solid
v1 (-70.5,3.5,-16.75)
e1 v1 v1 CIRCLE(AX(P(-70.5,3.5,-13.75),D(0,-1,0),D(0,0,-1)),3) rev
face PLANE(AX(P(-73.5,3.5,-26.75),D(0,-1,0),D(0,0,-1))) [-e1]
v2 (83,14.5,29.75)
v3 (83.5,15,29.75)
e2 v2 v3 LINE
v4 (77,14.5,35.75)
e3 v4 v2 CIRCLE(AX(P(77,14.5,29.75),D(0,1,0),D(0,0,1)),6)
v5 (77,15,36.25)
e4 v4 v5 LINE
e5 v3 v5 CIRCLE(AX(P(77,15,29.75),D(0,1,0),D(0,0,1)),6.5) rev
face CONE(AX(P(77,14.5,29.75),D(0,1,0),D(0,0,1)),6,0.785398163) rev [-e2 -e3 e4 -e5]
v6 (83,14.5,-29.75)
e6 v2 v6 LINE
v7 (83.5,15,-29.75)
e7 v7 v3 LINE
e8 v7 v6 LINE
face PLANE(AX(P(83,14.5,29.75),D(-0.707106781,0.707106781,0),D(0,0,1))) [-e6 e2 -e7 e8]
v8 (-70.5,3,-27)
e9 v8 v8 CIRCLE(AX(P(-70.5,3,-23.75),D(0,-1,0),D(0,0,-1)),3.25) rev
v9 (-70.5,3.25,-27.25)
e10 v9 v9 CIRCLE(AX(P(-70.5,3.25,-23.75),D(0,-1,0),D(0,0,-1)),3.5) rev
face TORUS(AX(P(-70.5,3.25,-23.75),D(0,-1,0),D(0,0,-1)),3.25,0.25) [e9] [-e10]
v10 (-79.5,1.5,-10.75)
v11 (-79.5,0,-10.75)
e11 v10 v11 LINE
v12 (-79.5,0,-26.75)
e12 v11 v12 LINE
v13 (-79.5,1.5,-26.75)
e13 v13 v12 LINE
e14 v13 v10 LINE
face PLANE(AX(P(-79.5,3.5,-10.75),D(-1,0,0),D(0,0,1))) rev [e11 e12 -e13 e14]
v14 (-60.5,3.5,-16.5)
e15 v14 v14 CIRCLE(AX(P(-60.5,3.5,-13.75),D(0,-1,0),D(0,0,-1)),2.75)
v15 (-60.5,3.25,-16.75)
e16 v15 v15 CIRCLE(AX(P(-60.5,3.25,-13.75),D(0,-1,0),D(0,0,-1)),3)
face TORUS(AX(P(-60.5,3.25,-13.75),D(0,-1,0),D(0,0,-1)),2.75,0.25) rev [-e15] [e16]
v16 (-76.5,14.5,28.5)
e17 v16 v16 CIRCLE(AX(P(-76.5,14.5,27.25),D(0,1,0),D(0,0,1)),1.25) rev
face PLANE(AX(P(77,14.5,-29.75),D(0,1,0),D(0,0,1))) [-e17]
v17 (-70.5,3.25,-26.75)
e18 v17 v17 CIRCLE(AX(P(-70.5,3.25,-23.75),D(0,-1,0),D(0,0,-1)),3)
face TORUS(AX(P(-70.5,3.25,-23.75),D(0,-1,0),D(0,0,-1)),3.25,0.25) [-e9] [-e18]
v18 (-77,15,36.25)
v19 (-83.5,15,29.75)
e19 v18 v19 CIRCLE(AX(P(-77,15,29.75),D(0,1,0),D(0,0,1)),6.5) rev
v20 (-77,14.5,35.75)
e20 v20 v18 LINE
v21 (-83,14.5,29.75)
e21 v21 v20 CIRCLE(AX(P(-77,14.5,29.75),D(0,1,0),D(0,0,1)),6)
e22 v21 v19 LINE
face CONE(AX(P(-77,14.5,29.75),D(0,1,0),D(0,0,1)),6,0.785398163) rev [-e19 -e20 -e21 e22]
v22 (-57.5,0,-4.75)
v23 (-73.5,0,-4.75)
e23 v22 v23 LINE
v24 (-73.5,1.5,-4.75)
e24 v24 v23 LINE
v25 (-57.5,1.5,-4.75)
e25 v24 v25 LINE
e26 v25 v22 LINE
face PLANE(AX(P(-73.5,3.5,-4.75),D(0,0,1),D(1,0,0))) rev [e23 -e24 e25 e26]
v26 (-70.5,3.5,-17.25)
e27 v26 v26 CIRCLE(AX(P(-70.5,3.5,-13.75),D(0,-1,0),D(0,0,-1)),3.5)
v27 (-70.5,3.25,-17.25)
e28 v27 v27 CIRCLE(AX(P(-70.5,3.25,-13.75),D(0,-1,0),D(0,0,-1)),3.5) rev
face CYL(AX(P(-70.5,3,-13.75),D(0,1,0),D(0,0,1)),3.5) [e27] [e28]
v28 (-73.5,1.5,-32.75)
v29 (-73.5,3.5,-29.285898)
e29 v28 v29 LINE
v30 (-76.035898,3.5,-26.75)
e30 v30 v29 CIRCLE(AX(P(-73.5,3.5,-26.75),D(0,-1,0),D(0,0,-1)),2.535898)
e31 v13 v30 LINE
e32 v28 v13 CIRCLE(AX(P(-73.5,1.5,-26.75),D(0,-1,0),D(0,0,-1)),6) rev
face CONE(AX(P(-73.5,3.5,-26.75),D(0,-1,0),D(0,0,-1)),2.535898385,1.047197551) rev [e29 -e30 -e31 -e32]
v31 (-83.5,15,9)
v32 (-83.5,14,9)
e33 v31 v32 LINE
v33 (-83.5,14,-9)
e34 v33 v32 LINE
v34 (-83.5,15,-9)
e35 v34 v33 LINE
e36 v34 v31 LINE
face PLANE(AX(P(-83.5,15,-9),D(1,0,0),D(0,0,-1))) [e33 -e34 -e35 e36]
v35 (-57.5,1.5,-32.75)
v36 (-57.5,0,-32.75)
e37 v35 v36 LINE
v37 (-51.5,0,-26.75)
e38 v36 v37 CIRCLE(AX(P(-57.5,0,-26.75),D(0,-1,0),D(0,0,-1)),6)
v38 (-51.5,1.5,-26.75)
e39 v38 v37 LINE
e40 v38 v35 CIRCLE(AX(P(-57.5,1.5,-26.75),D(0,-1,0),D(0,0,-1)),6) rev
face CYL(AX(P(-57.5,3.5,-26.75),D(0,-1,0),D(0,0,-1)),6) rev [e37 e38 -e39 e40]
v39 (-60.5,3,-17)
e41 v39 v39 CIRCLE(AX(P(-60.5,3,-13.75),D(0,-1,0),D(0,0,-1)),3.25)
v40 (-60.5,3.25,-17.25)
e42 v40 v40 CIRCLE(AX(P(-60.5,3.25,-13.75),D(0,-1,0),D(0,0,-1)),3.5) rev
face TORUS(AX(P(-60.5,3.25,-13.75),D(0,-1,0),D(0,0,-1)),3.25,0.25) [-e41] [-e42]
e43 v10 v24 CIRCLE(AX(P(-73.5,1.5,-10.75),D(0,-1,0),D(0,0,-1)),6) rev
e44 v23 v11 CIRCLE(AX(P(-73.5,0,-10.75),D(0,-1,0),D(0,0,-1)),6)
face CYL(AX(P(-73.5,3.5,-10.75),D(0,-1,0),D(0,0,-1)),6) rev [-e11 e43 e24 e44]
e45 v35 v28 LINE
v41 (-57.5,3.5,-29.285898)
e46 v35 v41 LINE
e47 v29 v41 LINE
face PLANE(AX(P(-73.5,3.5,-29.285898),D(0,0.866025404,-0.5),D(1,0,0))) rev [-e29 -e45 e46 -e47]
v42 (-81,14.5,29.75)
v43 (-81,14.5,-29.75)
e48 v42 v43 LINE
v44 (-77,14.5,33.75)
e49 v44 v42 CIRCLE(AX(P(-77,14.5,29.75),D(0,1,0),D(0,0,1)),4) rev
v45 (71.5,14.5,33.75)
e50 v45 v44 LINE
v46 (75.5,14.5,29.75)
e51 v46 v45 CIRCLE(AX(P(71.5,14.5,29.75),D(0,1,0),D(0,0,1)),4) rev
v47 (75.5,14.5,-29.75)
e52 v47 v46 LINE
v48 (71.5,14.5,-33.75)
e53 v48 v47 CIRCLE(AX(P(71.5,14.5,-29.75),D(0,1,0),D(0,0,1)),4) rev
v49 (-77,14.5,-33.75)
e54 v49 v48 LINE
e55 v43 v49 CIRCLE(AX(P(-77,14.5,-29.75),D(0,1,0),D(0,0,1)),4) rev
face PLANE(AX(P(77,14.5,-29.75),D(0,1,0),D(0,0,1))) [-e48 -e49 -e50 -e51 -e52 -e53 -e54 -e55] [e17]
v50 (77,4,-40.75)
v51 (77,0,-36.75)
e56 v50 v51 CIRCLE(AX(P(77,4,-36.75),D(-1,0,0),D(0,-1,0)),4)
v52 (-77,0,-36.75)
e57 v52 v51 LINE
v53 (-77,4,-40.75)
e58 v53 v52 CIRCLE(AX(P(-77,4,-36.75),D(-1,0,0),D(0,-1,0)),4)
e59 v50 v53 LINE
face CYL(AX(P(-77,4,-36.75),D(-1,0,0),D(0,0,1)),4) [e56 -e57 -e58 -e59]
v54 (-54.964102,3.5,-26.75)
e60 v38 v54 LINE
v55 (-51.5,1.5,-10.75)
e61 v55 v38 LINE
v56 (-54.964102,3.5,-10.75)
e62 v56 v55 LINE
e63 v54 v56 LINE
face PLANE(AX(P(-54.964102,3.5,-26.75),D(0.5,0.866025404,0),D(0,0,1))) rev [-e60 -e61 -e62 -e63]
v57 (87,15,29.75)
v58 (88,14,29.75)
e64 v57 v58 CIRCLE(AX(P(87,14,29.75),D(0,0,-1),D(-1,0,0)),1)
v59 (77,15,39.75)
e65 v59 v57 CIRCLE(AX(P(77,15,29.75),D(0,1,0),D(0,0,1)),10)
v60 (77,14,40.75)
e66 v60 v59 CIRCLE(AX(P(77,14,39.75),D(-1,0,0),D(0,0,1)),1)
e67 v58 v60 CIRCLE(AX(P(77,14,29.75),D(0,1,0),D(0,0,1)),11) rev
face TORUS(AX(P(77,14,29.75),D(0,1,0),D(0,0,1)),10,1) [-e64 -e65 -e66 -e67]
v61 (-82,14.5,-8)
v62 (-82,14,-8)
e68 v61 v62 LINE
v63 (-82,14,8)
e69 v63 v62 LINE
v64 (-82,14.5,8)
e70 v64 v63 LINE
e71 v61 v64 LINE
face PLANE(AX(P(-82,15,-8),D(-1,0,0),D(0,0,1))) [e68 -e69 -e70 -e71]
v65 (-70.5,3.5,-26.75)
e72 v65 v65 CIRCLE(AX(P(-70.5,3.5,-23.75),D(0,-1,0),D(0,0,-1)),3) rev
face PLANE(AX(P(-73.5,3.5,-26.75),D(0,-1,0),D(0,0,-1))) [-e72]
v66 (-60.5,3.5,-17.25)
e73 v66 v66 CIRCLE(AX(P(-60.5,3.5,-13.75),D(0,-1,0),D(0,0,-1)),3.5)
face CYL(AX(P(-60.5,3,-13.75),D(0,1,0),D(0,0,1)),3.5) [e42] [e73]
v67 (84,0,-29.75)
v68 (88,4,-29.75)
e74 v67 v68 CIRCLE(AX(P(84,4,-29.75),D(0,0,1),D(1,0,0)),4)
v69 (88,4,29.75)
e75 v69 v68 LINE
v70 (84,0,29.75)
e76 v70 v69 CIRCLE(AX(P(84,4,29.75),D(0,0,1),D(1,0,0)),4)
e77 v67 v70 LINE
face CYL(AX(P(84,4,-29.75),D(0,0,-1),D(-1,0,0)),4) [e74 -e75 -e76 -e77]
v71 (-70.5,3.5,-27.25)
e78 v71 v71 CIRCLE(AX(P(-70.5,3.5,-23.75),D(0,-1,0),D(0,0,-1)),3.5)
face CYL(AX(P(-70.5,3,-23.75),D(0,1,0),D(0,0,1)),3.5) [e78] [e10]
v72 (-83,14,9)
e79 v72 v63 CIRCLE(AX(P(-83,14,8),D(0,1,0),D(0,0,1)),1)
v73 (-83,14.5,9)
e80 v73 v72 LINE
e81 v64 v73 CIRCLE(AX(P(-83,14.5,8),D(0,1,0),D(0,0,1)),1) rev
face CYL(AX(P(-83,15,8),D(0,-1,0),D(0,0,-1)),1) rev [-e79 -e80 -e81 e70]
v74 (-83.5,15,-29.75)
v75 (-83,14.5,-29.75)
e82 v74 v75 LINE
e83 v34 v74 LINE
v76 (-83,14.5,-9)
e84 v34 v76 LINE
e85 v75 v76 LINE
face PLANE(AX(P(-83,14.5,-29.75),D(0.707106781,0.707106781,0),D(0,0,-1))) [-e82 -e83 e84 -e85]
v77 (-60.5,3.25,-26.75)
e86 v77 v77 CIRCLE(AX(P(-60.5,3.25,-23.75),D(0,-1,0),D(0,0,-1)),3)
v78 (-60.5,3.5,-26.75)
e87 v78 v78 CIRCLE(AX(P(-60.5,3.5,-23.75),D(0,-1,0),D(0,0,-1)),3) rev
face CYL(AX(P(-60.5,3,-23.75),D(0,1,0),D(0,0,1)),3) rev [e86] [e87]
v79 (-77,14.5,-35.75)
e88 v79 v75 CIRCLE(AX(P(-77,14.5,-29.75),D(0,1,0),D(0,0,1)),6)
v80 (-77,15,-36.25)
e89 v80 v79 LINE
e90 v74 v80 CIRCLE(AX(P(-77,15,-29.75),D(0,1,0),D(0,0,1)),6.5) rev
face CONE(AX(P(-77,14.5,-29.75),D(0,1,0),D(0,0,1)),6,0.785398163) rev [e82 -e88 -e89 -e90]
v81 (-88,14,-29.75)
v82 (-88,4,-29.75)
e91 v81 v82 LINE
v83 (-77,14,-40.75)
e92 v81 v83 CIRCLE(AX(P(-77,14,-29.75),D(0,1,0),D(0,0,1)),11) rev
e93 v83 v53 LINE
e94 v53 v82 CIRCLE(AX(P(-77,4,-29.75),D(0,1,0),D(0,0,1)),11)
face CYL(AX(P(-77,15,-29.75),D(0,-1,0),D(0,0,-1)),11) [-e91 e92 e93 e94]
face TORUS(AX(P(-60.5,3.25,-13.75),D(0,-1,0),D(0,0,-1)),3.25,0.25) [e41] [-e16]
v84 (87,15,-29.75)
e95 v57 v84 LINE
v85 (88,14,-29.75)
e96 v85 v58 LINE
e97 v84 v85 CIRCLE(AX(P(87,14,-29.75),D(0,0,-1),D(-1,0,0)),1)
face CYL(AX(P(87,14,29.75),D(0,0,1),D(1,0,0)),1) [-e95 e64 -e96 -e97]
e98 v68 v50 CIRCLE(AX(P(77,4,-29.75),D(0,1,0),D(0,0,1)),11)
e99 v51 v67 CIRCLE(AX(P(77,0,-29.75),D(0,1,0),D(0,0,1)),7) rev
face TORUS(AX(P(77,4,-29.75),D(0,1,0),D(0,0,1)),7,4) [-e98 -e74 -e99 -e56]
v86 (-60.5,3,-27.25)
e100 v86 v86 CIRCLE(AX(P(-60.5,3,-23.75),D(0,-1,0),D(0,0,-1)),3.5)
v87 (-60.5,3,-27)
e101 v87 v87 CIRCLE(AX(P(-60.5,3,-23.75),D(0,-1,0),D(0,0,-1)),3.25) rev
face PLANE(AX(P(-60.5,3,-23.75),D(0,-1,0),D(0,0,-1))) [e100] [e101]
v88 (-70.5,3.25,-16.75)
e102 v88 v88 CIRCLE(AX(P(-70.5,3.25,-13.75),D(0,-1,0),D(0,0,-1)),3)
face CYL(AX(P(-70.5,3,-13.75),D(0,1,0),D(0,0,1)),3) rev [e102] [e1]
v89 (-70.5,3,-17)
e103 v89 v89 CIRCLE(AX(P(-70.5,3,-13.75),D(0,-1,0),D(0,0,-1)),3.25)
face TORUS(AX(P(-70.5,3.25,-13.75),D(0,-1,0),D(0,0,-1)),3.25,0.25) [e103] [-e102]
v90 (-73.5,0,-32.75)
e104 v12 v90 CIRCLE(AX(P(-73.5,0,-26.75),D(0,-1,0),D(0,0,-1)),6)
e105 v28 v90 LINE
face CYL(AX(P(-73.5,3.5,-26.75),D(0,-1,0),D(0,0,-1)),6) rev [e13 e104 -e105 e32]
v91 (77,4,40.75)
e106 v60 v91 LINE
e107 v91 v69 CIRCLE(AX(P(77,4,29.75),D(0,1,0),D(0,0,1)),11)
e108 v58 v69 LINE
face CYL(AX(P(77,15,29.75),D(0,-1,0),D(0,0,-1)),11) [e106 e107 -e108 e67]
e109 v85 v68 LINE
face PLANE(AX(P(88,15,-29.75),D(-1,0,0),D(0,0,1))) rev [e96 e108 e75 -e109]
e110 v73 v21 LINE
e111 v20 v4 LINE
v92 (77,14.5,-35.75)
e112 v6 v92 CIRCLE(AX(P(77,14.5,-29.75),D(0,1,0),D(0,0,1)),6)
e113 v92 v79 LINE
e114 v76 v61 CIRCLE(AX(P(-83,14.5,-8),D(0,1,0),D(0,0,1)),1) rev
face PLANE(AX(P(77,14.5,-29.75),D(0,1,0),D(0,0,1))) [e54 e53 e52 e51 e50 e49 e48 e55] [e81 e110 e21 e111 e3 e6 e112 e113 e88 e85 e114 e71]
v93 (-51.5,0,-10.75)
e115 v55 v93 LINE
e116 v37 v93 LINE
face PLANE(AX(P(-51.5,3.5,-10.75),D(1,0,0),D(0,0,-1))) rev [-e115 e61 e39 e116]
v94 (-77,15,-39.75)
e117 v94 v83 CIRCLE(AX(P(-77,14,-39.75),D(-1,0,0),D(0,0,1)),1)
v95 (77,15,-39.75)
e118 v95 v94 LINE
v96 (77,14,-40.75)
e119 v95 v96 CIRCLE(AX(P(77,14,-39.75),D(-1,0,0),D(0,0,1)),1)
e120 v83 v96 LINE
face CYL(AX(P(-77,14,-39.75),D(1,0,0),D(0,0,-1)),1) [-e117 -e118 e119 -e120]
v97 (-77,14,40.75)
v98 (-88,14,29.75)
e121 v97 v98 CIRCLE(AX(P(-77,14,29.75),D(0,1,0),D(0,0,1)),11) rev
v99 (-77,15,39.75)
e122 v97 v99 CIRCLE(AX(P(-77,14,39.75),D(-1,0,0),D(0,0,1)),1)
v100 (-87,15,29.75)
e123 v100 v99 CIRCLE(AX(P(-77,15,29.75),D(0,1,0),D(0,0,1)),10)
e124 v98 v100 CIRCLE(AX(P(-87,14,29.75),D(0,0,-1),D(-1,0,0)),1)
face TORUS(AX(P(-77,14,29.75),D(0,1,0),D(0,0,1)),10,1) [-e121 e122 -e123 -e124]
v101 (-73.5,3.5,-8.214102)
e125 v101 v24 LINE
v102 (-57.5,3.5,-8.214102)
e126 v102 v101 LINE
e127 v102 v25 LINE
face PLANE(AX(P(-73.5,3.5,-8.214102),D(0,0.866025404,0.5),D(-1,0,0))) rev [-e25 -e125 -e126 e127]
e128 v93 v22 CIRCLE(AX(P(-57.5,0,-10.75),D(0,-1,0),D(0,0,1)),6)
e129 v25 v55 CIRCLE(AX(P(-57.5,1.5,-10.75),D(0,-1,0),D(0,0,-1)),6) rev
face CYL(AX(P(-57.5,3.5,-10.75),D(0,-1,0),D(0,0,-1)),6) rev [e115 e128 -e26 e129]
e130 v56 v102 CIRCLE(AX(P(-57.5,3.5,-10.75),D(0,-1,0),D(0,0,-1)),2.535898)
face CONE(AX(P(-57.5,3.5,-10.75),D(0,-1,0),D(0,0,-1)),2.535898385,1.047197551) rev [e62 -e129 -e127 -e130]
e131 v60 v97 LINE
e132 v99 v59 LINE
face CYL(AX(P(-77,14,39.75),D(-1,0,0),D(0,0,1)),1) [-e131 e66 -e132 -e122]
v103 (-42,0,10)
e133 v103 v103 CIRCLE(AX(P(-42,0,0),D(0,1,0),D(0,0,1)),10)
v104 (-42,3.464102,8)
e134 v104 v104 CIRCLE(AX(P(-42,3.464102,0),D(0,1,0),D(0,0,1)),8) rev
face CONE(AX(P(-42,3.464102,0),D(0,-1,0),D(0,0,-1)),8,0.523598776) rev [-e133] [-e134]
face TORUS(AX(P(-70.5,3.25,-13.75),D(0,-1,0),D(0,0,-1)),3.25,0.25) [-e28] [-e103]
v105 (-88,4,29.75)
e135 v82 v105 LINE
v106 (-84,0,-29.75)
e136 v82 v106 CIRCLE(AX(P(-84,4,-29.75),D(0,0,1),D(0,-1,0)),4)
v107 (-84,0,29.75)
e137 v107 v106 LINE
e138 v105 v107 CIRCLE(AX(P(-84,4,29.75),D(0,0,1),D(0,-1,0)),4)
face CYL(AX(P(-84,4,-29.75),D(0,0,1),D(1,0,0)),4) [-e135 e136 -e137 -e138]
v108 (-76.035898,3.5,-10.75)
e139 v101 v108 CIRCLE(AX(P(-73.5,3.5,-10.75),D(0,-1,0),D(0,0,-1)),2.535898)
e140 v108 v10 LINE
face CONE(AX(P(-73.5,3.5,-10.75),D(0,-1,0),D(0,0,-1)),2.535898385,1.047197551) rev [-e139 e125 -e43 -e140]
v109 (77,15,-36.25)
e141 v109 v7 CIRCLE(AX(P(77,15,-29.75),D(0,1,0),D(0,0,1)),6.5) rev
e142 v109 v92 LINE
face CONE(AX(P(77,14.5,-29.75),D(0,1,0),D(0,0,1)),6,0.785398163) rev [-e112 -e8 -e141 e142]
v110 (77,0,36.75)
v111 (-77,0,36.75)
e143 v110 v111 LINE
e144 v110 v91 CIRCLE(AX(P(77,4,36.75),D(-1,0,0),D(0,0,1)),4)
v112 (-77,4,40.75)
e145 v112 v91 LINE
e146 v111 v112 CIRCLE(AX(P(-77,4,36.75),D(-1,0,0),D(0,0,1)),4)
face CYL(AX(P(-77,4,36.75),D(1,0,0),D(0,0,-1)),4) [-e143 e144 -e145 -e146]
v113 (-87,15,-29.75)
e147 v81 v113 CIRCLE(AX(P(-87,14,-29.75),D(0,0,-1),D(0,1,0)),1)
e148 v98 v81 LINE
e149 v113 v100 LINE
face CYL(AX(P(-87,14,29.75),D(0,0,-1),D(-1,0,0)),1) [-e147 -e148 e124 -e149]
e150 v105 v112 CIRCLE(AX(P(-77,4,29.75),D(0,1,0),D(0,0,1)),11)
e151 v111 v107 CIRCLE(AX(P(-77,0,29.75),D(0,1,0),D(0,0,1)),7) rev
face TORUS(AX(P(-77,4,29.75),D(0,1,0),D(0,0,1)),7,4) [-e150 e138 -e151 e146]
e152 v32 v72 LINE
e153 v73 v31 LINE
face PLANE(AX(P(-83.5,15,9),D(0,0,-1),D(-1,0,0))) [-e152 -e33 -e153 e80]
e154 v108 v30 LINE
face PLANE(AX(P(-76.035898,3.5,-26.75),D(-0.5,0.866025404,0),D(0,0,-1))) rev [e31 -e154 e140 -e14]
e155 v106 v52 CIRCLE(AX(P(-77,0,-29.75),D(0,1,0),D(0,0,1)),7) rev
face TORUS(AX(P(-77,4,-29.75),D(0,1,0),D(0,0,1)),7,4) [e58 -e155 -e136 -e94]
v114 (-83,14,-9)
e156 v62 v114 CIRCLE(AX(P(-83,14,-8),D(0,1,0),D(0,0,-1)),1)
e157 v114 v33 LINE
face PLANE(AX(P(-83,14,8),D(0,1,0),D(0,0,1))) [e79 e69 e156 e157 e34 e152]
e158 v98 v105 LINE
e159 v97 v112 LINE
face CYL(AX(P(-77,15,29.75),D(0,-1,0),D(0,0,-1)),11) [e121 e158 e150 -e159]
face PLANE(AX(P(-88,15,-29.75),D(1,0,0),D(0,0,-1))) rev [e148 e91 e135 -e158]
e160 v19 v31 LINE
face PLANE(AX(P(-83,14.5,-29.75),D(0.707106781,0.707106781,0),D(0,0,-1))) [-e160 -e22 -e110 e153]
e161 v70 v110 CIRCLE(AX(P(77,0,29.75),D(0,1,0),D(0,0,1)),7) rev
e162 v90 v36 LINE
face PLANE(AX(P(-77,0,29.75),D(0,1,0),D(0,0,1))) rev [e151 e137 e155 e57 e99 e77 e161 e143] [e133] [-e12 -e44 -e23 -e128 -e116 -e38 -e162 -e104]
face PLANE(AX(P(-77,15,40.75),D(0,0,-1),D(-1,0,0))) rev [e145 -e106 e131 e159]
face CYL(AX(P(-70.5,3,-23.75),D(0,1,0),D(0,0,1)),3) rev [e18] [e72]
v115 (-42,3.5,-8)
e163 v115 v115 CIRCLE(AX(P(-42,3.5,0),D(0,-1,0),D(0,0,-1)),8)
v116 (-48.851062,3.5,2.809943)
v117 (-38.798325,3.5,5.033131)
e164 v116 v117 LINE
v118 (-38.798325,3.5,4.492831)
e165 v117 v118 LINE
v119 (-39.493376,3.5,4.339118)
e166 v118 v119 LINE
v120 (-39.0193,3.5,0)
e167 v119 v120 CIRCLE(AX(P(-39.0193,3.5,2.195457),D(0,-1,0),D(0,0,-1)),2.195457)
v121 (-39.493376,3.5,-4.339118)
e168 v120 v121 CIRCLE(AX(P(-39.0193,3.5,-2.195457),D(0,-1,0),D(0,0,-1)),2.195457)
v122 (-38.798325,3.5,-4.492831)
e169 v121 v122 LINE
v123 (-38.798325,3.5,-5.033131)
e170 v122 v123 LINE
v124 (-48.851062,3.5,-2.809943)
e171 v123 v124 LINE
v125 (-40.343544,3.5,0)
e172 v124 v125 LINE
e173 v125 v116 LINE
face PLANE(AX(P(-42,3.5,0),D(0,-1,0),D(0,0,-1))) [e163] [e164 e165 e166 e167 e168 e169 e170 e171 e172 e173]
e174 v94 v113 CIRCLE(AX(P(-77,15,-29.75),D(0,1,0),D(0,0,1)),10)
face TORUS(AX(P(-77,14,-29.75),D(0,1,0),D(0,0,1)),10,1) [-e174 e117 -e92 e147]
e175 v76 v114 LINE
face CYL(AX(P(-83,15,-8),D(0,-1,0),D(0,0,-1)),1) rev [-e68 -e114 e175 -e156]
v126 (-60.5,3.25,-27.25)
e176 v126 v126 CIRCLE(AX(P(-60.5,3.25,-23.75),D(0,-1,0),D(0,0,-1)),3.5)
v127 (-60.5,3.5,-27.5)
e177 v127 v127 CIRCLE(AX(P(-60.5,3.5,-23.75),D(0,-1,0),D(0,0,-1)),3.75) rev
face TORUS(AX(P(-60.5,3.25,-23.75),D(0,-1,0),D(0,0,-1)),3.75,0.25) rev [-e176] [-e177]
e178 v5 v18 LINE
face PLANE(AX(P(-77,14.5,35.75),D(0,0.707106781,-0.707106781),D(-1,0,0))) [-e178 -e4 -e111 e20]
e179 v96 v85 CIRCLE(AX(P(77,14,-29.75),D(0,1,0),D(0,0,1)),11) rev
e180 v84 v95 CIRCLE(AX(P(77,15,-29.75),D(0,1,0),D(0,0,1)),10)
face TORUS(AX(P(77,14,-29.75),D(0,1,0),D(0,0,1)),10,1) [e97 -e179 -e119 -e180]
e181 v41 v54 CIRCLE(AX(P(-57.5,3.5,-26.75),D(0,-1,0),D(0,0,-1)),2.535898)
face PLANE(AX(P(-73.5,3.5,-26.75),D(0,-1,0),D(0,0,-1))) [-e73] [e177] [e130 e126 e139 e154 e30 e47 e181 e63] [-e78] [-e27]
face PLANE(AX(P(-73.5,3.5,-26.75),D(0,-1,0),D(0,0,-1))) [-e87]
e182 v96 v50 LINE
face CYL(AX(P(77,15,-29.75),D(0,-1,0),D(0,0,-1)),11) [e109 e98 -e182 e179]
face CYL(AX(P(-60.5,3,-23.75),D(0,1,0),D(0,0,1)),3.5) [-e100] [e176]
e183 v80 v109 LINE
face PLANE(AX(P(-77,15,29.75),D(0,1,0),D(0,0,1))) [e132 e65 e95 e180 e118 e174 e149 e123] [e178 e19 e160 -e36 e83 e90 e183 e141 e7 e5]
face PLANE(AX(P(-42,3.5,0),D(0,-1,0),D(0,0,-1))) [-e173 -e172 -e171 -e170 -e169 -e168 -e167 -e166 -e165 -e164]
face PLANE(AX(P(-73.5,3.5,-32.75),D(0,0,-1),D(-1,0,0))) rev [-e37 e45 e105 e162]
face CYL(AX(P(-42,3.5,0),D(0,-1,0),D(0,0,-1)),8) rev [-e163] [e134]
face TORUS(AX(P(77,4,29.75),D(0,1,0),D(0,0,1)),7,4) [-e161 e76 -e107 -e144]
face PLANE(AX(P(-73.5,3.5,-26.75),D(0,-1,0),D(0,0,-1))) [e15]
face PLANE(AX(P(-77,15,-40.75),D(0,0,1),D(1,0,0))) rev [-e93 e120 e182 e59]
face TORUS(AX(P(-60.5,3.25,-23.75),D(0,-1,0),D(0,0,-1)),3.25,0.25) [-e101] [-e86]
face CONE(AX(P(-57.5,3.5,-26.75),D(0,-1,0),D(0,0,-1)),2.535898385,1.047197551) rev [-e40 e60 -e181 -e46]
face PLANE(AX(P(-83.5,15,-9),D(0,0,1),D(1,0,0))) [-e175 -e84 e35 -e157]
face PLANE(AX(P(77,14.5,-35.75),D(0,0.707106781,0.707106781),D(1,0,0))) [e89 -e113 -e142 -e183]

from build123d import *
from OCP.BRepFilletAPI import BRepFilletAPI_MakeChamfer

# Parameters (mm, degrees)
SALIENTE_EXTRUIR2_DEPTH    = 15
REDONDEO1_R                = 1
REDONDEO2_R                = 4
CORTAR_EXTRUIR1_DEPTH      = 0.5
CHAFL_N1_SIZE              = 0.5
CORTAR_EXTRUIR2_DEPTH      = 99.055150429
CORTAR_EXTRUIR2_DEPTH_BACK = 0.5
CROQUIS6_R                 = 8
CORTAR_EXTRUIR3_DEPTH      = 3.5
CHAFL_N2_SIZE              = 2
CHAFL_N2_SIZE2             = 3.464101615
CROQUIS7_R                 = 3.5
CROQUIS7_R_2               = 3
SALIENTE_EXTRUIR3_DEPTH    = 0.5
REDONDEO5_R                = 0.25


with BuildPart() as part:
    # Croquis1 → Saliente-Extruir2 (new body)
    with BuildSketch(Plane(origin=(0, 0, 0), x_dir=(1, 0, 0), z_dir=(0, 1, 0))):
        with BuildLine():
            Line((-77, 40.75), (77, 40.75))
            ThreePointArc((77, 40.75), (84.778174593, 37.528174593), (88, 29.75))
            Line((88, 29.75), (88, -29.75))
            ThreePointArc((88, -29.75), (84.778174593, -37.528174593), (77, -40.75))
            Line((77, -40.75), (-77, -40.75))
            ThreePointArc((-77, -40.75), (-84.778174593, -37.528174593), (-88, -29.75))
            Line((-88, -29.75), (-88, 29.75))
            ThreePointArc((-88, 29.75), (-84.778174593, 37.528174593), (-77, 40.75))
        make_face()
    extrude(amount=SALIENTE_EXTRUIR2_DEPTH)

    # Redondeo1
    redondeo1_edges = [part.edges().sort_by_distance(p)[0] for p in [
        (84.778174593, 15, 37.528174593),
        (88, 15, 0),
        (84.778174593, 15, -37.528174593),
        (0, 15, -40.75),
        (-84.778174593, 15, -37.528174593),
        (-88, 15, 0),
        (-84.778174593, 15, 37.528174593),
        (0, 15, 40.75),
    ]]
    fillet(redondeo1_edges, radius=REDONDEO1_R)

    # Redondeo2
    redondeo2_edges = [part.edges().sort_by_distance(p)[0] for p in [
        (88, 0, 0),
        (84.778174593, 0, 37.528174593),
        (0, 0, 40.75),
        (-84.778174593, 0, 37.528174593),
        (-88, 0, 0),
        (-84.778174593, 0, -37.528174593),
        (0, 0, -40.75),
        (84.778174593, 0, -37.528174593),
    ]]
    fillet(redondeo2_edges, radius=REDONDEO2_R)

    # Croquis2 → Cortar-Extruir1 (cut)
    with BuildSketch(Plane(origin=(0, 15, 0), x_dir=(1, 0, 0), z_dir=(0, 1, 0))):
        with BuildLine():
            Line((77, 35.75), (-77, 35.75))
            ThreePointArc((-77, 35.75), (-81.242640687, 33.992640687), (-83, 29.75))
            Line((-83, 29.75), (-83, -29.75))
            ThreePointArc((-83, -29.75), (-81.242640687, -33.992640687), (-77, -35.75))
            Line((-77, -35.75), (77, -35.75))
            ThreePointArc((77, -35.75), (81.242640687, -33.992640687), (83, -29.75))
            Line((83, -29.75), (83, 29.75))
            ThreePointArc((83, 29.75), (81.242640687, 33.992640687), (77, 35.75))
        make_face()
    extrude(amount=-CORTAR_EXTRUIR1_DEPTH, mode=Mode.SUBTRACT)

    # Chaflán1
    chafl_n1_edges = [part.edges().sort_by_distance(p)[0] for p in [
        (83, 15, 0),
        (81.242640687, 15, -33.992640687),
        (81.242640687, 15, 33.992640687),
        (0, 15, -35.75),
        (0, 15, 35.75),
        (-81.242640687, 15, -33.992640687),
        (-81.242640687, 15, 33.992640687),
        (-83, 15, 0),
    ]]
    chamfer(chafl_n1_edges, length=CHAFL_N1_SIZE - 0.0001)  # a hair under: the kernel refuses the full size

    # Croquis5 → Cortar-Extruir2 (cut, two sides: drawn at the far end of the back side and taken through both)
    with BuildSketch(Plane(origin=(0, 14.5, 0), x_dir=(1, 0, 0), z_dir=(0, 1, 0)).offset(-CORTAR_EXTRUIR2_DEPTH_BACK)):
        with BuildLine():
            Line((-83.5, 9), (-83, 9))
            ThreePointArc((-83, 9), (-82.292893219, 8.707106781), (-82, 8))
            Line((-82, 8), (-82, -8))
            ThreePointArc((-82, -8), (-82.292893219, -8.707106781), (-83, -9))
            Line((-83, -9), (-83.5, -9))
            Line((-83.5, -9), (-83.5, 9))
        make_face()
    extrude(amount=CORTAR_EXTRUIR2_DEPTH + CORTAR_EXTRUIR2_DEPTH_BACK, mode=Mode.SUBTRACT)

    # Croquis6 → Cortar-Extruir3 (cut)
    with BuildSketch(Plane.XZ):
        with Locations(Location((-42, 0, 0), (0, 0, 270))):
            Circle(CROQUIS6_R)
        with BuildLine():
            Line((-73.5, -4.75), (-57.5, -4.75))
            ThreePointArc((-57.5, -4.75), (-53.257359313, -6.507359313), (-51.5, -10.75))
            Line((-51.5, -10.75), (-51.5, -26.75))
            ThreePointArc((-51.5, -26.75), (-53.257359313, -30.992640687), (-57.5, -32.75))
            Line((-57.5, -32.75), (-73.5, -32.75))
            ThreePointArc((-73.5, -32.75), (-77.742640687, -30.992640687), (-79.5, -26.75))
            Line((-79.5, -26.75), (-79.5, -10.75))
            ThreePointArc((-79.5, -10.75), (-77.742640687, -6.507359313), (-73.5, -4.75))
        make_face()
    extrude(amount=-CORTAR_EXTRUIR3_DEPTH, mode=Mode.SUBTRACT)

    # Chaflán2: one chamfer whose edges measure the first distance from different faces: ONE call of the kernel's chamfer builder (chamfer() names one face for all edges)
    chafl_n2_edges_1 = [part.edges().sort_by_distance(p)[0] for p in [
        (-42, 0, 8),
    ]]
    chafl_n2_side_1 = [part.faces().sort_by_distance(p)[0] for p in [
        (5.089288443, 0, 1.243908582),
    ]]
    chafl_n2_edges_2 = [part.edges().sort_by_distance(p)[0] for p in [
        (-77.742640687, 3.5, -30.992640687),
    ]]
    chafl_n2_side_2 = [part.faces().sort_by_distance(p)[0] for p in [
        (-77.742640687, 1.75, -30.992640687),
    ]]
    chafl_n2_edges_3 = [part.edges().sort_by_distance(p)[0] for p in [
        (-79.5, 3.5, -18.75),
    ]]
    chafl_n2_side_3 = [part.faces().sort_by_distance(p)[0] for p in [
        (-79.5, 1.75, -18.75),
    ]]
    chafl_n2_edges_4 = [part.edges().sort_by_distance(p)[0] for p in [
        (-77.742640687, 3.5, -6.507359313),
    ]]
    chafl_n2_side_4 = [part.faces().sort_by_distance(p)[0] for p in [
        (-77.742640687, 1.75, -6.507359313),
    ]]
    chafl_n2_edges_5 = [part.edges().sort_by_distance(p)[0] for p in [
        (-65.5, 3.5, -4.75),
    ]]
    chafl_n2_side_5 = [part.faces().sort_by_distance(p)[0] for p in [
        (-65.5, 1.75, -4.75),
    ]]
    chafl_n2_edges_6 = [part.edges().sort_by_distance(p)[0] for p in [
        (-53.257359313, 3.5, -6.507359313),
    ]]
    chafl_n2_side_6 = [part.faces().sort_by_distance(p)[0] for p in [
        (-53.257359313, 1.75, -6.507359313),
    ]]
    chafl_n2_edges_7 = [part.edges().sort_by_distance(p)[0] for p in [
        (-51.5, 3.5, -18.75),
    ]]
    chafl_n2_side_7 = [part.faces().sort_by_distance(p)[0] for p in [
        (-51.5, 1.75, -18.75),
    ]]
    chafl_n2_edges_8 = [part.edges().sort_by_distance(p)[0] for p in [
        (-53.257359313, 3.5, -30.992640687),
    ]]
    chafl_n2_side_8 = [part.faces().sort_by_distance(p)[0] for p in [
        (-53.257359313, 1.75, -30.992640687),
    ]]
    chafl_n2_edges_9 = [part.edges().sort_by_distance(p)[0] for p in [
        (-65.5, 3.5, -32.75),
    ]]
    chafl_n2_side_9 = [part.faces().sort_by_distance(p)[0] for p in [
        (-65.5, 1.75, -32.75),
    ]]
    chafl_n2 = BRepFilletAPI_MakeChamfer(part.part.solid().wrapped)
    for e in chafl_n2_edges_1:
        chafl_n2.Add(CHAFL_N2_SIZE, CHAFL_N2_SIZE2, e.wrapped, chafl_n2_side_1[0].wrapped)  # the first distance lies on this face
    for e in chafl_n2_edges_2:
        chafl_n2.Add(CHAFL_N2_SIZE, CHAFL_N2_SIZE2, e.wrapped, chafl_n2_side_2[0].wrapped)  # the first distance lies on this face
    for e in chafl_n2_edges_3:
        chafl_n2.Add(CHAFL_N2_SIZE, CHAFL_N2_SIZE2, e.wrapped, chafl_n2_side_3[0].wrapped)  # the first distance lies on this face
    for e in chafl_n2_edges_4:
        chafl_n2.Add(CHAFL_N2_SIZE, CHAFL_N2_SIZE2, e.wrapped, chafl_n2_side_4[0].wrapped)  # the first distance lies on this face
    for e in chafl_n2_edges_5:
        chafl_n2.Add(CHAFL_N2_SIZE, CHAFL_N2_SIZE2, e.wrapped, chafl_n2_side_5[0].wrapped)  # the first distance lies on this face
    for e in chafl_n2_edges_6:
        chafl_n2.Add(CHAFL_N2_SIZE, CHAFL_N2_SIZE2, e.wrapped, chafl_n2_side_6[0].wrapped)  # the first distance lies on this face
    for e in chafl_n2_edges_7:
        chafl_n2.Add(CHAFL_N2_SIZE, CHAFL_N2_SIZE2, e.wrapped, chafl_n2_side_7[0].wrapped)  # the first distance lies on this face
    for e in chafl_n2_edges_8:
        chafl_n2.Add(CHAFL_N2_SIZE, CHAFL_N2_SIZE2, e.wrapped, chafl_n2_side_8[0].wrapped)  # the first distance lies on this face
    for e in chafl_n2_edges_9:
        chafl_n2.Add(CHAFL_N2_SIZE, CHAFL_N2_SIZE2, e.wrapped, chafl_n2_side_9[0].wrapped)  # the first distance lies on this face
    add(Compound.cast(chafl_n2.Shape()), mode=Mode.REPLACE)

    # Croquis7 → Saliente-Extruir3 (add)
    # profile 1 of 4: a face of its own
    with BuildSketch(Plane.XZ.offset(-3.5)):
        with Locations(Location((-70.5, -23.75, 0), (0, 0, 270))):
            Circle(CROQUIS7_R)
        with Locations(Location((-70.5, -23.75, 0), (0, 0, 270))):
            Circle(CROQUIS7_R_2, mode=Mode.SUBTRACT)
    # profile 2 of 4: a face of its own
    with BuildSketch(Plane.XZ.offset(-3.5)):
        with Locations(Location((-60.5, -23.75, 0), (0, 0, 270))):
            Circle(CROQUIS7_R)
        with Locations(Location((-60.5, -23.75, 0), (0, 0, 270))):
            Circle(CROQUIS7_R_2, mode=Mode.SUBTRACT)
    # profile 3 of 4: a face of its own
    with BuildSketch(Plane.XZ.offset(-3.5)):
        with Locations(Location((-60.5, -13.75, 0), (0, 0, 270))):
            Circle(CROQUIS7_R)
        with Locations(Location((-60.5, -13.75, 0), (0, 0, 270))):
            Circle(CROQUIS7_R_2, mode=Mode.SUBTRACT)
    # profile 4 of 4: a face of its own
    with BuildSketch(Plane.XZ.offset(-3.5)):
        with Locations(Location((-70.5, -13.75, 0), (0, 0, 270))):
            Circle(CROQUIS7_R)
        with Locations(Location((-70.5, -13.75, 0), (0, 0, 270))):
            Circle(CROQUIS7_R_2, mode=Mode.SUBTRACT)
    extrude(amount=SALIENTE_EXTRUIR3_DEPTH)

    # Redondeo5
    redondeo5_edges = [part.edges().sort_by_distance(p)[0] for p in [
        (-70.5, 3, -20.25),
        (-70.5, 3, -20.75),
        (-60.5, 3.5, -20.25),
        (-60.5, 3, -20.75),
        (-60.5, 3.5, -10.75),
        (-60.5, 3, -10.25),
        (-60.5, 3, -10.75),
        (-70.5, 3, -10.25),
        (-70.5, 3, -10.75),
    ]]
    fillet(redondeo5_edges, radius=REDONDEO5_R - 0.0001)  # a hair under: the kernel refuses the full size


solid = part.part
